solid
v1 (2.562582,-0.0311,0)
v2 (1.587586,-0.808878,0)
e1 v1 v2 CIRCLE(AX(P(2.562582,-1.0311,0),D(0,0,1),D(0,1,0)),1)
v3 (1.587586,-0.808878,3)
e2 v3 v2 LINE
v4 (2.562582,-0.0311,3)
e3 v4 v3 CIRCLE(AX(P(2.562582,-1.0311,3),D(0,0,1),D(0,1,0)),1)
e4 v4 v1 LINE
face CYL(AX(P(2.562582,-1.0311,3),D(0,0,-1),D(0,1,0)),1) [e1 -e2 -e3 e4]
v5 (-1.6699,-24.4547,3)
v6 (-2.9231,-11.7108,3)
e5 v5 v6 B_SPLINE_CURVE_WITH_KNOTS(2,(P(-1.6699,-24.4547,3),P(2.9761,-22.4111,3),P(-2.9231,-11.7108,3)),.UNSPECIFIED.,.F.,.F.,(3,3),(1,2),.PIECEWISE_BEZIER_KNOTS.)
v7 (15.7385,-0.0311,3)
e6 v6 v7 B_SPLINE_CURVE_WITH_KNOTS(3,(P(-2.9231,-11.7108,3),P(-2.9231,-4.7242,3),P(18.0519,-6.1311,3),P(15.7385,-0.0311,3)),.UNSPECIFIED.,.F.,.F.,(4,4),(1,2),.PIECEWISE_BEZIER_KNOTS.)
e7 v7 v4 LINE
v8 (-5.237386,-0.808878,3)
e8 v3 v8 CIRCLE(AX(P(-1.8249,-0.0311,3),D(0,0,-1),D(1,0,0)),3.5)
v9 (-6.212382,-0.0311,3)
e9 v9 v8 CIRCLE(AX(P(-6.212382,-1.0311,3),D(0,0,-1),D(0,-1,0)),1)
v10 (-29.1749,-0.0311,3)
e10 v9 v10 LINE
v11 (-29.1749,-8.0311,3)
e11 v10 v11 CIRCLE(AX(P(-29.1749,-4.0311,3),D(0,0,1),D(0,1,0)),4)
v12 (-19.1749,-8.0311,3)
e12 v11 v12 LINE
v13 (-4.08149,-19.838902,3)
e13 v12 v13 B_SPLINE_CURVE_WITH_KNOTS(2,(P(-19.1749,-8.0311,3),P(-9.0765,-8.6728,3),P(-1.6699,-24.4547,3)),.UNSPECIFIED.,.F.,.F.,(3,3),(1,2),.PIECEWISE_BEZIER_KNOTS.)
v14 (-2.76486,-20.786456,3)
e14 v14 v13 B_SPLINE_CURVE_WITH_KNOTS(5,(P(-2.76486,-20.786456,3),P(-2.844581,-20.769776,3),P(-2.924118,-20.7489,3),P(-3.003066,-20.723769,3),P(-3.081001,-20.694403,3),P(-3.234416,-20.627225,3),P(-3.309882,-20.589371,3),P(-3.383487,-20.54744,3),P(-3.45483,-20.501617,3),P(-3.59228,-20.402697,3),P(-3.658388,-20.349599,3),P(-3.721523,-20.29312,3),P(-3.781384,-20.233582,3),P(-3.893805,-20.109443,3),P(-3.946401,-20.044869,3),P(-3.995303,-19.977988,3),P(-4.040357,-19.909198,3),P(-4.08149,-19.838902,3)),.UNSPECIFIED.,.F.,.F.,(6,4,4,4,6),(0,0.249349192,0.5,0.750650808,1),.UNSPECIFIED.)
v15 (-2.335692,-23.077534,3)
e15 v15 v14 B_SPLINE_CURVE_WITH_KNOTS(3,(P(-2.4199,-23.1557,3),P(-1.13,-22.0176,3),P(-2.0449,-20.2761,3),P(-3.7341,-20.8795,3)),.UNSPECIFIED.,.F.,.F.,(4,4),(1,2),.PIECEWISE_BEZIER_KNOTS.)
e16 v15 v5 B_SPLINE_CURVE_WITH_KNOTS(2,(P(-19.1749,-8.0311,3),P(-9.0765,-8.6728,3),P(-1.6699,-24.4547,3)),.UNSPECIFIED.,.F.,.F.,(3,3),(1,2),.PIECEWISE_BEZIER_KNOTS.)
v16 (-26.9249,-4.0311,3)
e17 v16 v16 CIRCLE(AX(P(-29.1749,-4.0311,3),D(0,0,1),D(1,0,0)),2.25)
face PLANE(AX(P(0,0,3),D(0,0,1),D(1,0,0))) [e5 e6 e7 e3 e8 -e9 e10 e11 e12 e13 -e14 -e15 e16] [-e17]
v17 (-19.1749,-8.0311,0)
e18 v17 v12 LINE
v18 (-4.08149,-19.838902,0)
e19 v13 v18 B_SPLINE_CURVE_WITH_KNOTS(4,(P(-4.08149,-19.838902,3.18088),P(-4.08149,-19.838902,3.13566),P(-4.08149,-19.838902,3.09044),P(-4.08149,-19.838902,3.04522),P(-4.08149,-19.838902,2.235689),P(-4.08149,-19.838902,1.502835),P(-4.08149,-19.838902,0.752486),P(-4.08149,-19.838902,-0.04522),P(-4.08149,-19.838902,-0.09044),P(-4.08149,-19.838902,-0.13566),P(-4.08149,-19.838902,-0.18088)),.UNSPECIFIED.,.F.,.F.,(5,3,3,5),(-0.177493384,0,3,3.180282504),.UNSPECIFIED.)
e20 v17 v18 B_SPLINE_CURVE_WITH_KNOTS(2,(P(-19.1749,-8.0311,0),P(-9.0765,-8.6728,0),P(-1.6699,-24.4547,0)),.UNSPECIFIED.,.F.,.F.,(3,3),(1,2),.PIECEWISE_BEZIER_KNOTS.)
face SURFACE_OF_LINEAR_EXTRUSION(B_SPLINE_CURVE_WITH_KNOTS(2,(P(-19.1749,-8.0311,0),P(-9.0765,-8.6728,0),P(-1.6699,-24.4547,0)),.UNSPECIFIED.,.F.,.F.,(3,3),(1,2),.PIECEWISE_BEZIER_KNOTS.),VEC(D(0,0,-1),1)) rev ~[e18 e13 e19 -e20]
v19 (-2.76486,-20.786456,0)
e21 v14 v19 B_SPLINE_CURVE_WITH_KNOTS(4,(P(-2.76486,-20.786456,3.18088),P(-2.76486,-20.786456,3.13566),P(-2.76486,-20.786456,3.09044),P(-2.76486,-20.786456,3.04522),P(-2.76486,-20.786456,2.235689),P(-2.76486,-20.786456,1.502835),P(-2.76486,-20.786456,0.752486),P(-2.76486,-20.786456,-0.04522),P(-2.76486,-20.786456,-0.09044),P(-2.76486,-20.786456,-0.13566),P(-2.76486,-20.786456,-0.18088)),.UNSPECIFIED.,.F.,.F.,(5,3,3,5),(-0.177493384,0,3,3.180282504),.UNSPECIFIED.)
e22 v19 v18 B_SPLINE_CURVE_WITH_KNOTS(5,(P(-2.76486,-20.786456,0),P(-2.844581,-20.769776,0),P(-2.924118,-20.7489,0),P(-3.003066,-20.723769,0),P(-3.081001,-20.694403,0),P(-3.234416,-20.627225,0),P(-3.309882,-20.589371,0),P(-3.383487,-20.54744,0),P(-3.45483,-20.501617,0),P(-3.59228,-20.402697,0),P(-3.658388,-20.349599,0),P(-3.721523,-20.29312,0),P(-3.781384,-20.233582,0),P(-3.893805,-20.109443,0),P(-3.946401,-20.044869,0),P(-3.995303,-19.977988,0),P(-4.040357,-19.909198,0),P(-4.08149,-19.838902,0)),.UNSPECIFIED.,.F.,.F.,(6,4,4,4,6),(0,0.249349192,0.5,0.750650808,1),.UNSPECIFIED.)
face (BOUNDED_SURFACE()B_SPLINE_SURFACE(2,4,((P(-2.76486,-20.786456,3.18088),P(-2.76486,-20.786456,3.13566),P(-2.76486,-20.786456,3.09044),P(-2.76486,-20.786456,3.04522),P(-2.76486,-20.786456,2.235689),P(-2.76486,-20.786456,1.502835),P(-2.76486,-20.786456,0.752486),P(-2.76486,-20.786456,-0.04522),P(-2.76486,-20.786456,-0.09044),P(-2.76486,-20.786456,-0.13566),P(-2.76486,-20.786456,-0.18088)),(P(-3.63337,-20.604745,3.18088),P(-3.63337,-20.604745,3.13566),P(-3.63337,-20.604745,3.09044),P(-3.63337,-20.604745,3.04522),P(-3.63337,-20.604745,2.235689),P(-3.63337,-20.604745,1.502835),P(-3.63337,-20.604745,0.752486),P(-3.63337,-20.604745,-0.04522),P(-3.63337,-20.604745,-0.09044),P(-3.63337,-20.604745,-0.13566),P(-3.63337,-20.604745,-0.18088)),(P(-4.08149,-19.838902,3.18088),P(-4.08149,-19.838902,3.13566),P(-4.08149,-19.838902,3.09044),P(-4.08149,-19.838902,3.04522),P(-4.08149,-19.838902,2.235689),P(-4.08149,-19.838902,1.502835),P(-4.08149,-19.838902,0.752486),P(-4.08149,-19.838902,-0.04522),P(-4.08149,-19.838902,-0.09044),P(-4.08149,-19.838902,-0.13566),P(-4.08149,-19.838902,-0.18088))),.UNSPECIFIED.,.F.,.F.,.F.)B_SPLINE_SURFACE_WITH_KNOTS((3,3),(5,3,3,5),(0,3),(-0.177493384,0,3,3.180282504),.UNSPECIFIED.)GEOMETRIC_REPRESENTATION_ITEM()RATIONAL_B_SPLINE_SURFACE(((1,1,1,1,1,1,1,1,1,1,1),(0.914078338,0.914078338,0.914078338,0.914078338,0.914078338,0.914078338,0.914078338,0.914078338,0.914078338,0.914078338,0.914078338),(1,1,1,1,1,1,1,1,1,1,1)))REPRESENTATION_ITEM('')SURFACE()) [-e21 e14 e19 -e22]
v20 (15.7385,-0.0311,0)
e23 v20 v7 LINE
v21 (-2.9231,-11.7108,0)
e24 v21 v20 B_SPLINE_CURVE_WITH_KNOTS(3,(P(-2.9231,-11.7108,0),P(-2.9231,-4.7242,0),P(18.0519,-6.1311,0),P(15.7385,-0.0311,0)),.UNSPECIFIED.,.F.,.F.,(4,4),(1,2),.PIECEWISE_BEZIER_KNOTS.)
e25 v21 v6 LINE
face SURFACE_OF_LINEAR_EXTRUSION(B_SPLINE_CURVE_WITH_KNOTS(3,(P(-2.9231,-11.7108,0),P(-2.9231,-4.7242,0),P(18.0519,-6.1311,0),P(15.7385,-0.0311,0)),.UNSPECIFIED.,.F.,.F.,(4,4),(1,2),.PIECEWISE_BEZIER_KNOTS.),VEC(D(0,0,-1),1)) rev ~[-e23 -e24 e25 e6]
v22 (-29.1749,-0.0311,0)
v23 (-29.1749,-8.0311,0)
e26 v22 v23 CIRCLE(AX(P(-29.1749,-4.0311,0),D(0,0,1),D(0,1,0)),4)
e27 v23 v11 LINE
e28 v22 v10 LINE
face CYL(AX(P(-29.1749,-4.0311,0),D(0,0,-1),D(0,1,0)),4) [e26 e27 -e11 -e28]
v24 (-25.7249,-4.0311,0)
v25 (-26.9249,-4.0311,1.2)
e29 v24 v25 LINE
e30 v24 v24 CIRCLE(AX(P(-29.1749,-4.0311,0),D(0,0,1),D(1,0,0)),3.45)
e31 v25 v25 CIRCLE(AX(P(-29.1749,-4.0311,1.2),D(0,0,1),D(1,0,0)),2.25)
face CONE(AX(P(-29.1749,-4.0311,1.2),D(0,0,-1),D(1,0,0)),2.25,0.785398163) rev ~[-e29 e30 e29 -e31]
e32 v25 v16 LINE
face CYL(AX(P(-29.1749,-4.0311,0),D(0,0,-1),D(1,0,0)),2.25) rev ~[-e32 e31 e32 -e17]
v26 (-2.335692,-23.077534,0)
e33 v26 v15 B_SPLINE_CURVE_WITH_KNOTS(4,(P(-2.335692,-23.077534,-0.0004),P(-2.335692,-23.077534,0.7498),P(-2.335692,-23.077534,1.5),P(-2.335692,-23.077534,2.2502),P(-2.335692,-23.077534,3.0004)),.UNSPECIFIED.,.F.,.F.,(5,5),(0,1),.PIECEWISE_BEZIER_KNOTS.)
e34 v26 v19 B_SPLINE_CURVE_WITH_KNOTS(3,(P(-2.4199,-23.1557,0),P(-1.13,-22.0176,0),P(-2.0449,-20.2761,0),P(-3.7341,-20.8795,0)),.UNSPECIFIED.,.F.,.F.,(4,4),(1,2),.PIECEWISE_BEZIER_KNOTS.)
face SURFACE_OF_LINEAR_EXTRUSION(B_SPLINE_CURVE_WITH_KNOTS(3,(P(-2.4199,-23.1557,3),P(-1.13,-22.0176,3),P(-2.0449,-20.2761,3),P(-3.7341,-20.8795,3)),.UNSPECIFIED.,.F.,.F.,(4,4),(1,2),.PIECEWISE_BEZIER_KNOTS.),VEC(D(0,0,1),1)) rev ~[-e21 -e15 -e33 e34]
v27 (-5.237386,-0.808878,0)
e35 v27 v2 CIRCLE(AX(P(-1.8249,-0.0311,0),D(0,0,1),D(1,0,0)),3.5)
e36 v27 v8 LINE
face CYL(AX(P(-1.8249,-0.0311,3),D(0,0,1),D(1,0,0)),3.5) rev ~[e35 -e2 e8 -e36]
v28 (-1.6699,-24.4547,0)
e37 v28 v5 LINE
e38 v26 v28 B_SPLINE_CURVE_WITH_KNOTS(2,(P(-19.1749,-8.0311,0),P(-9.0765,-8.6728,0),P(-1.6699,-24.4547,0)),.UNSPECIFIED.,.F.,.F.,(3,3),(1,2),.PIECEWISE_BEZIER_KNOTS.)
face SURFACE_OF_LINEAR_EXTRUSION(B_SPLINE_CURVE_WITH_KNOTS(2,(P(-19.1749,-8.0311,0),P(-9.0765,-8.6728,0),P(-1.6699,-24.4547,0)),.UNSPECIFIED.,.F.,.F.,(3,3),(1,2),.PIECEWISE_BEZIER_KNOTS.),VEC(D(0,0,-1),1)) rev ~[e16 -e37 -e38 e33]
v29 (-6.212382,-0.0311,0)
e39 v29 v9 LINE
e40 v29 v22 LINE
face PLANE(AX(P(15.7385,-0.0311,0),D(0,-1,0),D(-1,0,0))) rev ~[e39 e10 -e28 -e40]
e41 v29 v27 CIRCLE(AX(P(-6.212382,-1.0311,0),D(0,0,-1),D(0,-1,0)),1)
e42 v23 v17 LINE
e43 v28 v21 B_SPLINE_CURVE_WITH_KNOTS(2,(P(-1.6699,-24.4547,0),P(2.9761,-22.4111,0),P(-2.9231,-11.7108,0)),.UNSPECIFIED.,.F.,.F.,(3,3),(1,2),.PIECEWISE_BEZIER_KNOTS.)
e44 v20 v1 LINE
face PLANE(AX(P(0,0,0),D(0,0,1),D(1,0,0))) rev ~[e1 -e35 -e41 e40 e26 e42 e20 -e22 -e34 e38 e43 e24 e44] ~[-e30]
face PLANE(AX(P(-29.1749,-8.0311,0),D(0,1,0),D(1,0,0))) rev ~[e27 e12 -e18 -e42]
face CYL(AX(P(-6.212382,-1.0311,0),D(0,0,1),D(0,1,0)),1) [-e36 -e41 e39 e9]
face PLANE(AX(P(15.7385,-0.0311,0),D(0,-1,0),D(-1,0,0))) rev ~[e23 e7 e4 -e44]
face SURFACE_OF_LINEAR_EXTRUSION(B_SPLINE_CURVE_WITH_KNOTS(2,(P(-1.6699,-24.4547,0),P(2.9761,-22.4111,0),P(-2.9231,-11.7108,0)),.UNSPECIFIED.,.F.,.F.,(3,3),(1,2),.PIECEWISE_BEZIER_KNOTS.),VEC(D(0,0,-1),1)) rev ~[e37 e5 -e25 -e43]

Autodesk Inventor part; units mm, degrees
ref_plane "YZ Plane" through (0, 0, 0) normal (1, 0, 0) x (0, 1, 0)
ref_plane "XZ Plane" through (0, 0, 0) normal (0, 1, 0) x (-1, 0, 0)
ref_plane "XY Plane" through (0, 0, 0) normal (0, 0, 1) x (1, 0, 0)
sketch "Sketch1" plane through (0, 0, 0) normal (0, 0, 1) x (1, 0, 0)
  line L0 (15.7385, -0.0311) -> (-29.1749, -0.0311)
  line L1 (-29.1749, -0.0311) -> (2.0558, -0.0311) construction
  line L2 (-29.1749, -8.0311) -> (-19.1749, -8.0311)
  line L3 (-19.1749, -8.0311) -> (-9.0765, -8.6728) construction
  line L4 (-9.0765, -8.6728) -> (-1.6699, -24.4547) construction
  spline S0 degree 2 poles (-19.1749, -8.0311) (-9.0765, -8.6728) (-1.6699, -24.4547) knots 1 1 1 2 2 2
  line L5 (-1.6699, -24.4547) -> (2.9761, -22.4111) construction
  line L6 (2.9761, -22.4111) -> (-2.9231, -11.7108) construction
  spline S1 degree 2 poles (-1.6699, -24.4547) (2.9761, -22.4111) (-2.9231, -11.7108) knots 1 1 1 2 2 2
  line L7 (-2.9231, -11.7108) -> (-2.9231, -4.7242) construction
  line L8 (-2.9231, -4.7242) -> (18.0519, -6.1311) construction
  line L9 (18.0519, -6.1311) -> (15.7385, -0.0311) construction
  spline S2 degree 3 poles (-2.9231, -11.7108) (-2.9231, -4.7242) (18.0519, -6.1311) (15.7385, -0.0311) knots 1 1 1 1 2 2 2 2
  arc A0 (-29.1749, -0.0311) -> (-29.1749, -8.0311) centre (-29.1749, -4.0311) ccw
  circle A1 centre (-29.1749, -4.0311) radius 2.25
  point P0 (0, 0)
  dimension "d0" = 8
  dimension "d1" = 10
  dimension "d2" = 4.5
extrude "Extrusion1" add sketch "Sketch1" along normal blind 3
sketch "Sketch2" plane through (0, 0, 3) normal (0, 0, 1) x (1, 0, 0)
  line L0 (15.7385, -0.0311) -> (-29.1749, -0.0311) projected
  line L1 (-29.1749, -0.0311) -> (-1.8249, -0.0311)
  circle A0 centre (-1.8249, -0.0311) radius 3.5
  point P0 (0, 0)
  dimension "d5" = 27.35
  dimension "d6" = 7
extrude "Extrusion2" cut sketch "Sketch2" against normal blind 3
sketch "Sketch3" plane through (0, 0, 3) normal (0, 0, 1) x (1, 0, 0)
  line L0 (-1.6699, -24.4547) -> (-2.4199, -23.1557)
  line L1 (-1.6699, -24.4547) -> (-0.1699, -24.4547) construction
  line L2 (-3.7341, -20.8795) -> (-2.4199, -23.1557)
  line L3 (-2.4199, -23.1557) -> (-1.13, -22.0176) construction
  line L4 (-1.13, -22.0176) -> (-2.0449, -20.2761) construction
  line L5 (-2.0449, -20.2761) -> (-3.7341, -20.8795) construction
  spline S0 degree 3 poles (-2.4199, -23.1557) (-1.13, -22.0176) (-2.0449, -20.2761) (-3.7341, -20.8795) knots 1 1 1 1 2 2 2 2
  point P0 (0, 0)
  dimension "d9" = 1.5
  dimension "d10" = 120
extrude "Extrusion3" cut sketch "Sketch3" against normal blind 3
fillet "Fillet2" radius 2 1 edges at (-3.5248, -20.8155, 1.5)
chamfer "Chamfer1" distance 1.2 angle 45 1 edges at (-31.4249, -4.0311, 0)
fillet "Fillet4" radius 1 2 edges at (1.6751, -0.0311, 1.5) (-5.3249, -0.0311, 1.5)
properties part number "retreat"
